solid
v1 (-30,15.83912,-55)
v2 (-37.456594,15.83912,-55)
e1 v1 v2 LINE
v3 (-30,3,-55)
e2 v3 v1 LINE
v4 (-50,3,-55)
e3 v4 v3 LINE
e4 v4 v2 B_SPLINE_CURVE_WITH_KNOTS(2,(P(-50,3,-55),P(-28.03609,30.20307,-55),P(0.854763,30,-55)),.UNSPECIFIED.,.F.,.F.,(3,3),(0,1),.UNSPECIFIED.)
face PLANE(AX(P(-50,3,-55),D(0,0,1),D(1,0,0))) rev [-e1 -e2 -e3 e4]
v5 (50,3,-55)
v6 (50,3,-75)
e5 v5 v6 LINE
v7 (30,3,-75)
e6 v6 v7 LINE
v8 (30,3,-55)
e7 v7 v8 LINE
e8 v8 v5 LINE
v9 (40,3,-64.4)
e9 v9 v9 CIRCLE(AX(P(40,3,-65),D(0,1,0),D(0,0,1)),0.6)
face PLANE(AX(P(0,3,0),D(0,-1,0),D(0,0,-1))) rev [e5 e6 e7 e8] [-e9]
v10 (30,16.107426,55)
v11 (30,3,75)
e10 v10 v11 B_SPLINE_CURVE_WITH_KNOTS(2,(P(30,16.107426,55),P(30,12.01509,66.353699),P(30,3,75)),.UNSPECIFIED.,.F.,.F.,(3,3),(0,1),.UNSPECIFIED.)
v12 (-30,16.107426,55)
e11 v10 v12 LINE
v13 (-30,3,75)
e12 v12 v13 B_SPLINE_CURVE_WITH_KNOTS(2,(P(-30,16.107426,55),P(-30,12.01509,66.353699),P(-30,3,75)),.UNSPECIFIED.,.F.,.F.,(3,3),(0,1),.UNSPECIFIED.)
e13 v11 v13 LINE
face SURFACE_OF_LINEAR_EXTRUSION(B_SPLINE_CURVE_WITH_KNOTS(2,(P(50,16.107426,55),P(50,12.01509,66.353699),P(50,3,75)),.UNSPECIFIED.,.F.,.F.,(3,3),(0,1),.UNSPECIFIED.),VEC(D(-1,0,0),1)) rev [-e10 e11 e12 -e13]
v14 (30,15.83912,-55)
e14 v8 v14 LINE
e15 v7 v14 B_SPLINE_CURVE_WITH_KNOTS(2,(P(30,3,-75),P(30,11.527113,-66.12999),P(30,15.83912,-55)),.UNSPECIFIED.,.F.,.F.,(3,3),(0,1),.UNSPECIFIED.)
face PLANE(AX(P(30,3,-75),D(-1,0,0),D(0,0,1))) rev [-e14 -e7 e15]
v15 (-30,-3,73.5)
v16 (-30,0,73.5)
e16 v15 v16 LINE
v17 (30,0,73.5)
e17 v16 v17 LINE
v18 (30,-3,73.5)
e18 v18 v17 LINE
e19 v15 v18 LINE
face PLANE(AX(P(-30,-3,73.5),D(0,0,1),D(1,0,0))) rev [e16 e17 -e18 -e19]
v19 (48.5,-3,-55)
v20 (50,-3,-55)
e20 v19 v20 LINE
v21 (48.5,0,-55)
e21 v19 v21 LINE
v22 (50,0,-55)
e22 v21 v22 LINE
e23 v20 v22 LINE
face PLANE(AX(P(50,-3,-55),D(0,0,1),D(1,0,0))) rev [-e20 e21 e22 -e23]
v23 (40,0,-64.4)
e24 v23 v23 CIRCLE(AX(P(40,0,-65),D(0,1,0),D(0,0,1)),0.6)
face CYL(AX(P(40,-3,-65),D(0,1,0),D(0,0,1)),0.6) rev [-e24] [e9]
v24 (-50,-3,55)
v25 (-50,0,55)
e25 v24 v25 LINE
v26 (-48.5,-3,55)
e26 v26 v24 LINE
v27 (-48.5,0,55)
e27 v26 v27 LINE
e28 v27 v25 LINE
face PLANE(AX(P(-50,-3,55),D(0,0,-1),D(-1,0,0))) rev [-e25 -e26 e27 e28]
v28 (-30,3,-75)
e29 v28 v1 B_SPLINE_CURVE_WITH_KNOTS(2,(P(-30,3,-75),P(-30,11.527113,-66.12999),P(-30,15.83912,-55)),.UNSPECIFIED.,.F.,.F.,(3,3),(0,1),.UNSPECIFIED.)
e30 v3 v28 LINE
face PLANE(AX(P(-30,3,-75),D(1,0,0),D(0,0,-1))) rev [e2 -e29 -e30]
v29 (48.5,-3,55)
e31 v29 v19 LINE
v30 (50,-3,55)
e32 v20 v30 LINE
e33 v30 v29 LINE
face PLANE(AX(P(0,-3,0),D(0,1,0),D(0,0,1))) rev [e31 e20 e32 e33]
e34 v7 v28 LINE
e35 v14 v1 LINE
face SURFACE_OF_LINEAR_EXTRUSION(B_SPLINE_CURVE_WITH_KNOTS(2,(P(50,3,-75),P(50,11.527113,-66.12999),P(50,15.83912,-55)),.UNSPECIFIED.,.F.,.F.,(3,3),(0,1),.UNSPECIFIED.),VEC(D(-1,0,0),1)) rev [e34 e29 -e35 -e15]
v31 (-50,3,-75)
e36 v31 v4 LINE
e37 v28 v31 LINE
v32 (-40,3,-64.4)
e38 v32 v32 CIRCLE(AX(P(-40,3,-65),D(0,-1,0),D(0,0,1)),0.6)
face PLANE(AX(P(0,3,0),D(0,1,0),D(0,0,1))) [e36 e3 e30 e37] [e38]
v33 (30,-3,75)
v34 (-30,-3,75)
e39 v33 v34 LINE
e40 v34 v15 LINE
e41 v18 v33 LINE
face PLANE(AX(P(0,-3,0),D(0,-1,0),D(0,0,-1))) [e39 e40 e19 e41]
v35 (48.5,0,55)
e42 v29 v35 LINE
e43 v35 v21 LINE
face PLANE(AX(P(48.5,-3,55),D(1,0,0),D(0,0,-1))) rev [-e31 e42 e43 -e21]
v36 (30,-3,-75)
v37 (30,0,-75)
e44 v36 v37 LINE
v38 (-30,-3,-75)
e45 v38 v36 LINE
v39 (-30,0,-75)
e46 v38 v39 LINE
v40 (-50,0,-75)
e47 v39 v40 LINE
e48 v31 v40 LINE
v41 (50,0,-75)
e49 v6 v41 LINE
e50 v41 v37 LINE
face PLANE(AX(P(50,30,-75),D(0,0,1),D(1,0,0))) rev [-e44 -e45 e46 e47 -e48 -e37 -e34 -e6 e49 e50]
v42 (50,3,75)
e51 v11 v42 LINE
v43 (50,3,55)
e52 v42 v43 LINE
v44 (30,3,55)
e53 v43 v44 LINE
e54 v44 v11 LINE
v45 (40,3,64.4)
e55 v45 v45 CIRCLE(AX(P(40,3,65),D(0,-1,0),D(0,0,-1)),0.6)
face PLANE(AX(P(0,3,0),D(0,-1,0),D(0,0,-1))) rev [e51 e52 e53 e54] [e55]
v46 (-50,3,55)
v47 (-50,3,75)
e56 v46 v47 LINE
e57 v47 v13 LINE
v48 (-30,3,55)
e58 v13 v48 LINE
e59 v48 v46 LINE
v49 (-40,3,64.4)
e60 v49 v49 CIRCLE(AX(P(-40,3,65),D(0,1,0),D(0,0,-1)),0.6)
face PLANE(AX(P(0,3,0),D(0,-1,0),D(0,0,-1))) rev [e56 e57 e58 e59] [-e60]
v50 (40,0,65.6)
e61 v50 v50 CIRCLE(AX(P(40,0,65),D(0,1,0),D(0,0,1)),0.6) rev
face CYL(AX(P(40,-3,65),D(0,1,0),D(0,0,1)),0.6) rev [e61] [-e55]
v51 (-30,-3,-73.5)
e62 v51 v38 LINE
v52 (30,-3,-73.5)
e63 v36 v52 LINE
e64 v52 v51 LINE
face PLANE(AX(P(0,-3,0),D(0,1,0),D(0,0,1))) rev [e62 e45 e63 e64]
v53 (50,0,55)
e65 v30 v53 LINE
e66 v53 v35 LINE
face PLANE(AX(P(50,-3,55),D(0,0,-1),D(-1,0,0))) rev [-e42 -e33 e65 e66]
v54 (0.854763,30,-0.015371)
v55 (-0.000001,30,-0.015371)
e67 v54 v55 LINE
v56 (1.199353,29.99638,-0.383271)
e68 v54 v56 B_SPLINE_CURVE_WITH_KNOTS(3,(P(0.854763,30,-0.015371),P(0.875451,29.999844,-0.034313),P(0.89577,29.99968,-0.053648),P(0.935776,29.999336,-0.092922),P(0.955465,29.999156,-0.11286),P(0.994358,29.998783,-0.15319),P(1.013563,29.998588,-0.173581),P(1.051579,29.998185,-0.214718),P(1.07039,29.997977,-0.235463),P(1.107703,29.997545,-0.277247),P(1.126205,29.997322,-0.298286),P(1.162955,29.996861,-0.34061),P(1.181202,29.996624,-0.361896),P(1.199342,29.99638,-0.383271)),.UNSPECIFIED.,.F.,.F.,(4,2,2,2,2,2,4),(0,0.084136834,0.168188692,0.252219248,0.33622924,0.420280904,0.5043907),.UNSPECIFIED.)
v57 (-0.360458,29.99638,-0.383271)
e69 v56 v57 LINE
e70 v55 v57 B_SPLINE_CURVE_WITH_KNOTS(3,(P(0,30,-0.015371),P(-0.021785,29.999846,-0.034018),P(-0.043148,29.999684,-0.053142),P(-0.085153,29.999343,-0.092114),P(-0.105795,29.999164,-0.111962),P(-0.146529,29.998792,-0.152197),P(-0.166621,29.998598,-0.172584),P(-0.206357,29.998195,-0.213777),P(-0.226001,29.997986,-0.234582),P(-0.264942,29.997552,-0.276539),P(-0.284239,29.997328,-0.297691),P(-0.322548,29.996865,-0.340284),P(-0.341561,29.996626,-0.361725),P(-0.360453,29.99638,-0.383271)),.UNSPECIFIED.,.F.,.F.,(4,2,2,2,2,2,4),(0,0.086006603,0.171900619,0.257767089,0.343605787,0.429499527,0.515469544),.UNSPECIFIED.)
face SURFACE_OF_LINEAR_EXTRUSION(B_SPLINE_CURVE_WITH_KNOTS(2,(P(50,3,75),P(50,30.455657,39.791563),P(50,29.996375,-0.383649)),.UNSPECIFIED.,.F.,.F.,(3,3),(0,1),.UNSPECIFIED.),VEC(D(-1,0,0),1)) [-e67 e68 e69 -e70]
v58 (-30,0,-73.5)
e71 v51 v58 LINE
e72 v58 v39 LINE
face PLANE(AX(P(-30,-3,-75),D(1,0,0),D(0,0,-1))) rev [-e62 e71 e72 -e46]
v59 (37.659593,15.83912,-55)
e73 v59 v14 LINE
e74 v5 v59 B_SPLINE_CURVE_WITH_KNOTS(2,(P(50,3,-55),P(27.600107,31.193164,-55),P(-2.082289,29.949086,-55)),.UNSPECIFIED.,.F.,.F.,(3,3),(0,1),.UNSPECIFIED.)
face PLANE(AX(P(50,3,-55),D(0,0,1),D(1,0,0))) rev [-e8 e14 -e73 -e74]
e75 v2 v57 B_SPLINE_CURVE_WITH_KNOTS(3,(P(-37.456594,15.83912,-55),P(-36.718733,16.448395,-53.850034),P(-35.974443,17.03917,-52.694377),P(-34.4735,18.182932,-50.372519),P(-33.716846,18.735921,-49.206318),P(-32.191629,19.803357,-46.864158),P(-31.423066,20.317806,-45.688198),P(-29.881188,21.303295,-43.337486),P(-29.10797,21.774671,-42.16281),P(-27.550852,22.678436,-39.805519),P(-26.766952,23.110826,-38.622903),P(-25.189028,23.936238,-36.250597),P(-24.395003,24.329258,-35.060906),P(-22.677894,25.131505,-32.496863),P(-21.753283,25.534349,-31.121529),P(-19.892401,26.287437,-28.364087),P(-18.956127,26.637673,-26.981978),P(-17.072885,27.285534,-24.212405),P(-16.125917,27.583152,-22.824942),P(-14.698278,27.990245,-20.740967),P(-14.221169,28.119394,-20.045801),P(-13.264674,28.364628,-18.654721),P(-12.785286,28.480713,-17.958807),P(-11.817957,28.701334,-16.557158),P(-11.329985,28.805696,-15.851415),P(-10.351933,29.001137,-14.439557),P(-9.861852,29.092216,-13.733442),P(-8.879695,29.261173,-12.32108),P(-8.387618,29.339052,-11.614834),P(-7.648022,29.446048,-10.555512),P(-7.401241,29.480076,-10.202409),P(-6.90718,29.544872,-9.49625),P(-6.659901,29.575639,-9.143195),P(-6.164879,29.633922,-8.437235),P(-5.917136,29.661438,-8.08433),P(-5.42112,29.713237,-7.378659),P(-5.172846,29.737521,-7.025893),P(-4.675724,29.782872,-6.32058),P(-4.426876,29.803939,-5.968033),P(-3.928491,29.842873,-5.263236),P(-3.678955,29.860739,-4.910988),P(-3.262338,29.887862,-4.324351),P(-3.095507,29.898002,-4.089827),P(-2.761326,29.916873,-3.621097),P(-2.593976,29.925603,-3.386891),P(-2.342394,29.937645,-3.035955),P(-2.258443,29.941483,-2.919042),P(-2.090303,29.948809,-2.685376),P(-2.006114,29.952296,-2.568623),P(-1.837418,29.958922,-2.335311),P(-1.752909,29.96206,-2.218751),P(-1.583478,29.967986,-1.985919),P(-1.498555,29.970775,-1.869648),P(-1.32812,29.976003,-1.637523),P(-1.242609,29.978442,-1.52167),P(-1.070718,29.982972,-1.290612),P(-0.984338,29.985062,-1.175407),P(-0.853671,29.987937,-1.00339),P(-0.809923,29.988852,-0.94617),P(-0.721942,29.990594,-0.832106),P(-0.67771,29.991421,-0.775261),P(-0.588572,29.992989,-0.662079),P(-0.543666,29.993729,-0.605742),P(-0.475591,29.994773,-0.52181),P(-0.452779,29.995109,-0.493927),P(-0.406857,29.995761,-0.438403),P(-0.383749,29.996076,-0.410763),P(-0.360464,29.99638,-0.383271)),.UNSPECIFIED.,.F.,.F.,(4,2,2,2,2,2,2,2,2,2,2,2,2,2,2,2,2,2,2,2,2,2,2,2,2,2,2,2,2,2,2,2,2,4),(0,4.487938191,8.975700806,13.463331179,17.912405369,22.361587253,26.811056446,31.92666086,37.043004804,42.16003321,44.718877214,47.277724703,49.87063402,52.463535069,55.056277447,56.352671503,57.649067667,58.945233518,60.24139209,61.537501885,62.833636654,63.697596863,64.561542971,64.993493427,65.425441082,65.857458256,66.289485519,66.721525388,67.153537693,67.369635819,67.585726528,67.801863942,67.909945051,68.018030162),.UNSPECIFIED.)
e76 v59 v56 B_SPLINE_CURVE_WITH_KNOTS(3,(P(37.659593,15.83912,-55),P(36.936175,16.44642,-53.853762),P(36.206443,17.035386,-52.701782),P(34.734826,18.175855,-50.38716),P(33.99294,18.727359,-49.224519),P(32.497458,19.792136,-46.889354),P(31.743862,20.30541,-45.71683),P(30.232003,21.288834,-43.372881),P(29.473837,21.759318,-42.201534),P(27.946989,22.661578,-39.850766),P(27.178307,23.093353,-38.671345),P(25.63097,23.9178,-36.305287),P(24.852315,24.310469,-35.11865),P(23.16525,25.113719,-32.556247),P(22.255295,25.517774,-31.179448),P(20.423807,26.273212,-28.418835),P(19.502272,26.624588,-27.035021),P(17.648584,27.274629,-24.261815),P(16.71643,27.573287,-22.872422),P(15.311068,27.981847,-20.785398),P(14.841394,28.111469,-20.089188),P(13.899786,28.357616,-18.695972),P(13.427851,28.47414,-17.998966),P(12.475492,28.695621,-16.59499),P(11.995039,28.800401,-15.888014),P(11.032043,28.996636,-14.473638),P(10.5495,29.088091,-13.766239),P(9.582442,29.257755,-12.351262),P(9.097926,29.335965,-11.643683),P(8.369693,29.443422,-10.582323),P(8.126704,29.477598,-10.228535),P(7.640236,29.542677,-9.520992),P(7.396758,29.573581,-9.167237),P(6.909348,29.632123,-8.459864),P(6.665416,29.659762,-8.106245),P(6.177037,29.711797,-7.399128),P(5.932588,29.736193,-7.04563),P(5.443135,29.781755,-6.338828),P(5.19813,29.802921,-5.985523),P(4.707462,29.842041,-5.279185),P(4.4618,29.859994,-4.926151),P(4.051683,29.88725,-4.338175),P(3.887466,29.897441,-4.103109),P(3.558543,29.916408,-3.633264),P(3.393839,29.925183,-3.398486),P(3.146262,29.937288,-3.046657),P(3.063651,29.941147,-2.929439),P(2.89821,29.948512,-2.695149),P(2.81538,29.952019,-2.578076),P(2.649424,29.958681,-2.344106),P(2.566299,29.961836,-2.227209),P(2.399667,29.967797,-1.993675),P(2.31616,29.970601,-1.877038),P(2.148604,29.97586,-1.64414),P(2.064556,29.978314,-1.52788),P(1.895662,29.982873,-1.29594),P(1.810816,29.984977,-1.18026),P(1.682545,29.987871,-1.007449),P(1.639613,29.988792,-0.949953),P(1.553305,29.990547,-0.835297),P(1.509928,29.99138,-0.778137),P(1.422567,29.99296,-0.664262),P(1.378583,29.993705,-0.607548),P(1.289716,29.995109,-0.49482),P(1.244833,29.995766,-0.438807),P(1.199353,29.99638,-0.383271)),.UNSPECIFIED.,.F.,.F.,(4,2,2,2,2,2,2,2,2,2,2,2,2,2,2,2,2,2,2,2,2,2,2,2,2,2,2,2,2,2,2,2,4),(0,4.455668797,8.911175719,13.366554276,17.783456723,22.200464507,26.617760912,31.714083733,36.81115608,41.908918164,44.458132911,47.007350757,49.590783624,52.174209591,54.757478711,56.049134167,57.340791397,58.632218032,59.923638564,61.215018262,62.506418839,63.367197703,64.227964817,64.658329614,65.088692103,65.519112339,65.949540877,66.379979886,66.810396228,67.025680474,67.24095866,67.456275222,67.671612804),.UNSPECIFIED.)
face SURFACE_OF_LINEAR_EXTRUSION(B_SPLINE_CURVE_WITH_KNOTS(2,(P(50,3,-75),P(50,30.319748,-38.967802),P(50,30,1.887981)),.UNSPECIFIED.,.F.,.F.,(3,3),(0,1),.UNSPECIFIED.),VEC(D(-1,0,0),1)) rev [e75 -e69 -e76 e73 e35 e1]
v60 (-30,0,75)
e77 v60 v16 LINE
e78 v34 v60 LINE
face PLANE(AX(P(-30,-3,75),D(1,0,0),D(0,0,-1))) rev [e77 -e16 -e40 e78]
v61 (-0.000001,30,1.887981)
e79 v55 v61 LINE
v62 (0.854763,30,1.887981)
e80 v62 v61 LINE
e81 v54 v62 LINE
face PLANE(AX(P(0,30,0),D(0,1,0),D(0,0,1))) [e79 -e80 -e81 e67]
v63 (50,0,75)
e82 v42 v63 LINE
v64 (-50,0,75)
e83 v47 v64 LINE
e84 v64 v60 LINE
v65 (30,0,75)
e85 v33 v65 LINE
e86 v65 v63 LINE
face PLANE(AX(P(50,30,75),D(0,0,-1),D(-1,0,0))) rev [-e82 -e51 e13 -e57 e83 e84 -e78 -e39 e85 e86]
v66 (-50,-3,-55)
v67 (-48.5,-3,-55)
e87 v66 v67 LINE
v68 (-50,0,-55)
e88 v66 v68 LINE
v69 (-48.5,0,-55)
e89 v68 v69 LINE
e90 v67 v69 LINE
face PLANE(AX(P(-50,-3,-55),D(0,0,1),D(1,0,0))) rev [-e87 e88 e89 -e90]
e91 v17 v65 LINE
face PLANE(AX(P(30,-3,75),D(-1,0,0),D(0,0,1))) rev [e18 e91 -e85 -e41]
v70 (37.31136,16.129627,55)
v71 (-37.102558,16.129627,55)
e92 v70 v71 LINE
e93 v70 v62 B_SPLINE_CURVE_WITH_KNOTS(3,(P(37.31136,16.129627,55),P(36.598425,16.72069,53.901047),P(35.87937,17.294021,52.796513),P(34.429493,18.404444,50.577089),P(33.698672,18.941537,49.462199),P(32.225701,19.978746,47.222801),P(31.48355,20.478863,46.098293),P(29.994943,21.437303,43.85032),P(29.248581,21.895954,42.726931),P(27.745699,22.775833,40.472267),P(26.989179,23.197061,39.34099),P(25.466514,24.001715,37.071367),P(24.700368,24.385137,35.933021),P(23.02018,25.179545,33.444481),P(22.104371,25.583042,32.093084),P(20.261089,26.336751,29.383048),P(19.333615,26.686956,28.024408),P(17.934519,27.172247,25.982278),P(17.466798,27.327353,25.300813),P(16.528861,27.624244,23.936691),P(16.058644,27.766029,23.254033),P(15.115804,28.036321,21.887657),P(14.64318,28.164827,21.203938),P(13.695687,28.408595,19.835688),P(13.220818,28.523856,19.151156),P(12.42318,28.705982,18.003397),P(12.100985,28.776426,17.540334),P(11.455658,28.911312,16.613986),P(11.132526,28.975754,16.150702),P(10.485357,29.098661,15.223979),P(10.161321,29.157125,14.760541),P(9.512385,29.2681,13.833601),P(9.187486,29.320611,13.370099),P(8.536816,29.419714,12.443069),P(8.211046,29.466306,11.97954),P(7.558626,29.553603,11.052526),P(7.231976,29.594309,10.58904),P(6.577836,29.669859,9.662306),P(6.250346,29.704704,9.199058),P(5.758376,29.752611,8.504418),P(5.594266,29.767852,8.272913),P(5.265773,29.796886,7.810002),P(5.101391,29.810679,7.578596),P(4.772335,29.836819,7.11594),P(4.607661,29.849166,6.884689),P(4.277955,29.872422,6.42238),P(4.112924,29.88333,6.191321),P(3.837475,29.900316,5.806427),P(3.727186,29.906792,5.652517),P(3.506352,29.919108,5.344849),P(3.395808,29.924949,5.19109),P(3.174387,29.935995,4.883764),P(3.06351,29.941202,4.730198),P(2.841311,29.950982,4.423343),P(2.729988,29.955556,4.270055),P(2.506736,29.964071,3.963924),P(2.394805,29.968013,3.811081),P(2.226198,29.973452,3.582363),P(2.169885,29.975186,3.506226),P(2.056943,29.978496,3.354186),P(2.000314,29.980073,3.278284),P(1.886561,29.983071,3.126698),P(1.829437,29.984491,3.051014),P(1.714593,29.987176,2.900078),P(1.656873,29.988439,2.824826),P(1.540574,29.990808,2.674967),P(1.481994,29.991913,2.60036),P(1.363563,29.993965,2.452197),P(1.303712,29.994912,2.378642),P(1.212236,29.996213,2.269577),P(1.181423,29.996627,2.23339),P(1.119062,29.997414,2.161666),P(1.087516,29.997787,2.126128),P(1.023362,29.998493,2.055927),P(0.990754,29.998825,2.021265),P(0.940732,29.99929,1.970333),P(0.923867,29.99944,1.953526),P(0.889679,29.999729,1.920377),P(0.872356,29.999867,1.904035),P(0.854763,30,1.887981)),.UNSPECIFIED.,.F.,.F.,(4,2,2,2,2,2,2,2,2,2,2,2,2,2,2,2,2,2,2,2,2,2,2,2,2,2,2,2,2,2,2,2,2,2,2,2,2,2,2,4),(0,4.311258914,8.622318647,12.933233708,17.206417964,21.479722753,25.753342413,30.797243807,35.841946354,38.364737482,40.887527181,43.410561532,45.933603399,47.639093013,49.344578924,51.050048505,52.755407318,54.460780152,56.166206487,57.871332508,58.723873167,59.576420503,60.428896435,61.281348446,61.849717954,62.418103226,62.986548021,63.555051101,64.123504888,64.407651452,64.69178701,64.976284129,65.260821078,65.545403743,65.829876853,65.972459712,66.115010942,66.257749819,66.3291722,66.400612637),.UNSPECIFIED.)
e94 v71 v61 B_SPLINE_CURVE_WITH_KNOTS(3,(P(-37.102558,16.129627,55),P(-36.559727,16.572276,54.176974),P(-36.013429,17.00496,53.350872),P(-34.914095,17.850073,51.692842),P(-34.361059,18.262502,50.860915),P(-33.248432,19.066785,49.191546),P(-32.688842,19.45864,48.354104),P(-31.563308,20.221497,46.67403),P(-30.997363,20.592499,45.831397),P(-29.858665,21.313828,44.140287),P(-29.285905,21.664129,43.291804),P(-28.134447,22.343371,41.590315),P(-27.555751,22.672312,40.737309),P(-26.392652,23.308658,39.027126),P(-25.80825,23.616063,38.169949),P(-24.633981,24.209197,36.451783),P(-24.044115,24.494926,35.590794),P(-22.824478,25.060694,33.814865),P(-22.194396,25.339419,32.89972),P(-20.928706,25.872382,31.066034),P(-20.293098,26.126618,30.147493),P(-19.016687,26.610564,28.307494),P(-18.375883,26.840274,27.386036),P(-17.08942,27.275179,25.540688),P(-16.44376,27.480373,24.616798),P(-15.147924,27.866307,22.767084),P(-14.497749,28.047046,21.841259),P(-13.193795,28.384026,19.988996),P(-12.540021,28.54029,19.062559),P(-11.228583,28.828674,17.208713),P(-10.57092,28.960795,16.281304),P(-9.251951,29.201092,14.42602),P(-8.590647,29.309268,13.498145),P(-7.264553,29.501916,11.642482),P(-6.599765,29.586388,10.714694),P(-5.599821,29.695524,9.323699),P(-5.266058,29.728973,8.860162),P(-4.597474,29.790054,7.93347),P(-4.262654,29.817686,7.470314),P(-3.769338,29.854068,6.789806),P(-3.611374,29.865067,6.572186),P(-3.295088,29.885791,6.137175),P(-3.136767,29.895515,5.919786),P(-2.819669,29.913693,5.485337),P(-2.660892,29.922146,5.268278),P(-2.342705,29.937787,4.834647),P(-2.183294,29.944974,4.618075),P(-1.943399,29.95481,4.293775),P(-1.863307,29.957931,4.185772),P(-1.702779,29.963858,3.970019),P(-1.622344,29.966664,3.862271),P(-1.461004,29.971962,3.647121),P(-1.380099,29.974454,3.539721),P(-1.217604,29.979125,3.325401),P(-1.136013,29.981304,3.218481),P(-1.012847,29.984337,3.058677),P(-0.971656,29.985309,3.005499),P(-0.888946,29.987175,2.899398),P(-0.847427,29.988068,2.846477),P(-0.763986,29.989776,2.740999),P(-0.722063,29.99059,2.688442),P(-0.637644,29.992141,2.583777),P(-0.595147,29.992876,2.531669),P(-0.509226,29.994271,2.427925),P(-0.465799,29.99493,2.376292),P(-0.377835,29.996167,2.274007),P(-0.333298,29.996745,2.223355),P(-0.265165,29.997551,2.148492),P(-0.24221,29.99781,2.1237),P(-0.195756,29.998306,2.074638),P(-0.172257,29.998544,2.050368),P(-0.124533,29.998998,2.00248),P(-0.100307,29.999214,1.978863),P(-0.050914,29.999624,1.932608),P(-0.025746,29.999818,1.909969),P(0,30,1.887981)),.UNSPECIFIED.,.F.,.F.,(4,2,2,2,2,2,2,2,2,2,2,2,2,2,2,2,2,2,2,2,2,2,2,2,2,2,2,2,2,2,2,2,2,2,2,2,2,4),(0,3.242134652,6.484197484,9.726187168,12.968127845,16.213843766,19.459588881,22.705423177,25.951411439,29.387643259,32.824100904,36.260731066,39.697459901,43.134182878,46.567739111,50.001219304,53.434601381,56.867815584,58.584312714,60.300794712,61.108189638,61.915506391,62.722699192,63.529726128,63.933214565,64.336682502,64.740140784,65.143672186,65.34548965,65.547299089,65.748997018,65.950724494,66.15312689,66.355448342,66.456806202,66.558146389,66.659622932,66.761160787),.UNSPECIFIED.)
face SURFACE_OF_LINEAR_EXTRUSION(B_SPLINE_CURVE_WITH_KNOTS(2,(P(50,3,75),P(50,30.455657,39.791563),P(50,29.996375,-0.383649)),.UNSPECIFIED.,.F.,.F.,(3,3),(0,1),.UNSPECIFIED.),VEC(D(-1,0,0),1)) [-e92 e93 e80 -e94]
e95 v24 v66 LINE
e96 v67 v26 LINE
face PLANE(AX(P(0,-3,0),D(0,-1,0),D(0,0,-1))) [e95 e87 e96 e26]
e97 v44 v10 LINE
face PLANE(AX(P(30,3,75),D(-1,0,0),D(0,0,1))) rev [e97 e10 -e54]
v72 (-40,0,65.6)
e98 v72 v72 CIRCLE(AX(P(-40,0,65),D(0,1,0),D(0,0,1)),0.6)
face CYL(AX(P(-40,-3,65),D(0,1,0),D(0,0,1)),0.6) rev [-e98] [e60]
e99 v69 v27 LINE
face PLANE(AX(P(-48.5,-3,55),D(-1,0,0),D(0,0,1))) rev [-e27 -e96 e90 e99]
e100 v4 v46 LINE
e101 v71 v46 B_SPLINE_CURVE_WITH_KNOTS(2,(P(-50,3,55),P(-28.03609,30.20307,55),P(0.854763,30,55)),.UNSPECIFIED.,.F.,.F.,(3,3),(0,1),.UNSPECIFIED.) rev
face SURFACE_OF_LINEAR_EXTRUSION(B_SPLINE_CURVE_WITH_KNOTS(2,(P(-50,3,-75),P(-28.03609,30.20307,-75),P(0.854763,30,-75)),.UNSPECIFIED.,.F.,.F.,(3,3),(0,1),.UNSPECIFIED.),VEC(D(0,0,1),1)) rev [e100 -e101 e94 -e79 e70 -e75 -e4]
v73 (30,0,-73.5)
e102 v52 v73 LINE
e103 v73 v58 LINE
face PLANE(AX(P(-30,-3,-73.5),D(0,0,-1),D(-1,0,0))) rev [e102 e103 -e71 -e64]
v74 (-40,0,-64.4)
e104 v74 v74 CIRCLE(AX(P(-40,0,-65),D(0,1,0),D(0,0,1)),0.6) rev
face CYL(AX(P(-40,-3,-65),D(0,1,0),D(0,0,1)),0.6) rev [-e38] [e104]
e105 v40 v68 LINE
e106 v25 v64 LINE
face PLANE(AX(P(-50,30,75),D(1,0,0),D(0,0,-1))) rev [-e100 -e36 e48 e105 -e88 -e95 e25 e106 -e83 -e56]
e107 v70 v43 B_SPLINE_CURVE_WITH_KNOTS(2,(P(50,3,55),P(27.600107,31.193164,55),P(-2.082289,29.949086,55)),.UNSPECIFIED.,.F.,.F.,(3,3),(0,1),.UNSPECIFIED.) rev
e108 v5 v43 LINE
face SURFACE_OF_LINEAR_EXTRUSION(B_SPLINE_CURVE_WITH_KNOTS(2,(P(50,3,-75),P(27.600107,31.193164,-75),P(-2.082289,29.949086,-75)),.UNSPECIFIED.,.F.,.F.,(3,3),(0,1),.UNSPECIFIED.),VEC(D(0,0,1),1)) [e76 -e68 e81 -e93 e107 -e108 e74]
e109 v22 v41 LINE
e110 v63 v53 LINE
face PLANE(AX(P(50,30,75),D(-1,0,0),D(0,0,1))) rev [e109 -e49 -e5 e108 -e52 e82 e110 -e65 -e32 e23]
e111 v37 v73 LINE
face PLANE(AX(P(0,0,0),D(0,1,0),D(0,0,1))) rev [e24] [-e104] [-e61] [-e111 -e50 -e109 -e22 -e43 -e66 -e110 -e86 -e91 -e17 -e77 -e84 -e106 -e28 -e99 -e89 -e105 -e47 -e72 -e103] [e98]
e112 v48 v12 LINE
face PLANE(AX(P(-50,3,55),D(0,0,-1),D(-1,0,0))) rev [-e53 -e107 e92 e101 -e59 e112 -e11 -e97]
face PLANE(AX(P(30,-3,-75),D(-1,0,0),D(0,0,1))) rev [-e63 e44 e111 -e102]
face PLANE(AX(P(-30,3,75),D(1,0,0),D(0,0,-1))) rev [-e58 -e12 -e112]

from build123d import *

# Parameters (mm, degrees)
CROQUIS1_W                = 100
CROQUIS1_H                = 150
SALIENTE_EXTRUIR1_DEPTH   = 30
CROQUIS3_W                = 1.5
CROQUIS3_H                = 110
CROQUIS3_W_2              = 60
CROQUIS3_H_2              = 1.5
SALIENTE_EXTRUIR2_DEPTH   = 3
CROQUIS5_W                = 20
CROQUIS5_H                = 20
CORTAR_EXTRUIR2_DEPTH     = 27
CROQUIS6_R                = 0.6
CORTAR_EXTRUIR3_DEPTH     = 95.09569597
SIMETR_A2_COPY_1_SKETCH_R = 0.6
SIMETR_A2_COPY_1_DEPTH    = 95.09569597
CORTAR_EXTRUIR4_DEPTH     = 129.549601322
CORTAR_EXTRUIR5_START     = -150
CORTAR_EXTRUIR5_DEPTH     = 150
CORTAR_EXTRUIR6_DEPTH     = 114.688170172
CORTAR_EXTRUIR7_DEPTH     = 114.688170172


# Read off the part's stored shape, not the designer's step: Cortar-Extruir5
with BuildPart() as part:
    # Croquis1 → Saliente-Extruir1 (new body)
    with BuildSketch(Plane(origin=(0, 0, 0), x_dir=(1, 0, 0), z_dir=(0, 1, 0))):
        Rectangle(CROQUIS1_W, CROQUIS1_H)
    extrude(amount=SALIENTE_EXTRUIR1_DEPTH)

    # Croquis3 → Saliente-Extruir2 (add)
    with BuildSketch(Plane.XZ):
        with Locations((-49.25, 0)):
            Rectangle(CROQUIS3_W, CROQUIS3_H)
        with Locations((0, -74.25)):
            Rectangle(CROQUIS3_W_2, CROQUIS3_H_2)
        with Locations((49.25, 0)):
            Rectangle(CROQUIS3_W, CROQUIS3_H)
        with Locations((0, 74.25)):
            Rectangle(CROQUIS3_W_2, CROQUIS3_H_2)
    extrude(amount=SALIENTE_EXTRUIR2_DEPTH)

    # Croquis5 → Cortar-Extruir2 (cut)
    with BuildSketch(Plane(origin=(0, 30, 0), x_dir=(1, 0, 0), z_dir=(0, 1, 0))):
        with Locations((-40, 65)):
            Rectangle(CROQUIS5_W, CROQUIS5_H)
        with Locations((40, 65)):
            Rectangle(CROQUIS5_W, CROQUIS5_H)
        with Locations((40, -65)):
            Rectangle(CROQUIS5_W, CROQUIS5_H)
        with Locations((-40, -65)):
            Rectangle(CROQUIS5_W, CROQUIS5_H)
    extrude(amount=-CORTAR_EXTRUIR2_DEPTH, mode=Mode.SUBTRACT)

    # Croquis6 → Cortar-Extruir3 (cut, through all)
    with BuildSketch(Plane(origin=(0, 3, 0), x_dir=(1, 0, 0), z_dir=(0, 1, 0))):
        with Locations(Location((40, 65, 0), (0, 0, 270))):
            Circle(CROQUIS6_R)
    cortar_extruir3 = extrude(amount=-CORTAR_EXTRUIR3_DEPTH, mode=Mode.SUBTRACT)

    # Simetría1: Cortar-Extruir3 across plane
    add(cortar_extruir3.mirror(Plane.XY), mode=Mode.SUBTRACT)

    # Simetría2: Cortar-Extruir3 across plane
    add(cortar_extruir3.mirror(Plane(origin=(0, 0, 0), x_dir=(0, 0, 1), z_dir=(1, 0, 0))), mode=Mode.SUBTRACT)

    # Simetría2 copy 1 sketch → Simetría2 copy 1 (cut, through all)
    with BuildSketch(Plane(origin=(0, 3, 0), x_dir=(-1, 0, 0), z_dir=(0, 1, 0))):
        with Locations(Location((40, 65, 0), (0, 0, 270))):
            Circle(SIMETR_A2_COPY_1_SKETCH_R)
    extrude(amount=-SIMETR_A2_COPY_1_DEPTH, mode=Mode.SUBTRACT)

    # Croquis7 → Cortar-Extruir4 (cut, through all)
    with BuildSketch(Plane.ZY.offset(50)):
        with BuildLine():
            Line((-55, 30), (-55, 15.839120061))
            add(Edge.make_bspline(
                [(-55, 15.839120061), (-28.872240535, 29.681618902), (-0.383648773, 29.996375418)],
                knots=[0.272557177, 0.272557177, 0.272557177, 0.972153635, 0.972153635, 0.972153635], degree=2))
            add(Edge.make_bspline(
                [(-0.015370594, 30), (-0.199457484, 29.998481088), (-0.383648773, 29.996375418)],
                knots=[0.9954153, 0.9954153, 0.9954153, 1, 1, 1], degree=2))
            Line((-0.015370594, 30), (-55, 30))
        make_face()
        with BuildLine():
            Line((55, 30), (1.887981045, 30))
            add(Edge.make_bspline(
                [(55, 16.129627481), (29.637077968, 29.770366226), (1.887981045, 30)],
                knots=[0.278550096, 0.278550096, 0.278550096, 0.971678885, 0.971678885, 0.971678885], degree=2))
            Line((55, 16.129627481), (55, 30))
        make_face()
    extrude(amount=-CORTAR_EXTRUIR4_DEPTH, mode=Mode.SUBTRACT)

    # Cortar-Extruir5 outline → Cortar-Extruir5 (cut)
    with BuildSketch(Plane.XY.offset(75).offset(CORTAR_EXTRUIR5_START)):
        with BuildLine():
            Line((7.5e-08, 30.000000001), (-50, 30))
            Line((-50, 30), (-50, 3))
            add(Edge.make_bspline(
                [(-50, 3), (-28.36157969, 29.799939616), (7.5e-08, 30.000000001)],
                knots=[0, 0, 0, 0.985180711, 0.985180711, 0.985180711], degree=2))
        make_face()
        with BuildLine():
            Line((50, 3), (50, 30))
            Line((50, 30), (0.854762637, 30))
            add(Edge.make_bspline(
                [(0.854762637, 30), (28.715142785, 29.789747772), (50, 3)],
                knots=[0.41802479, 0.41802479, 0.41802479, 1.368246178, 1.368246178, 1.368246178], degree=2))
        make_face()
    extrude(amount=CORTAR_EXTRUIR5_DEPTH, mode=Mode.SUBTRACT)

    # Croquis10 → Cortar-Extruir6 (cut, through all)
    with BuildSketch(Plane.ZY.offset(30)):
        with BuildLine():
            Line((75, 3), (75, 42.786726144))
            Line((75, 42.786726144), (55, 42.786726144))
            Line((55, 42.786726144), (55, 16.107425877))
            add(Edge.make_bspline(
                [(75, 3), (66.353698685, 12.015089749), (55, 16.107425877)],
                knots=[0, 0, 0, 1, 1, 1], degree=2))
        make_face()
    extrude(amount=-CORTAR_EXTRUIR6_DEPTH, mode=Mode.SUBTRACT)

    # Croquis11 → Cortar-Extruir7 (cut, through all)
    with BuildSketch(Plane.ZY.offset(30)):
        with BuildLine():
            Line((-75, 3), (-75, 36.400642598))
            Line((-75, 36.400642598), (-55, 36.400642598))
            Line((-55, 36.400642598), (-55, 15.839120066))
            add(Edge.make_bspline(
                [(-75, 3), (-66.12999018, 11.527113216), (-55, 15.839120066)],
                knots=[0, 0, 0, 1, 1, 1], degree=2))
        make_face()
    extrude(amount=-CORTAR_EXTRUIR7_DEPTH, mode=Mode.SUBTRACT)


solid = part.part
